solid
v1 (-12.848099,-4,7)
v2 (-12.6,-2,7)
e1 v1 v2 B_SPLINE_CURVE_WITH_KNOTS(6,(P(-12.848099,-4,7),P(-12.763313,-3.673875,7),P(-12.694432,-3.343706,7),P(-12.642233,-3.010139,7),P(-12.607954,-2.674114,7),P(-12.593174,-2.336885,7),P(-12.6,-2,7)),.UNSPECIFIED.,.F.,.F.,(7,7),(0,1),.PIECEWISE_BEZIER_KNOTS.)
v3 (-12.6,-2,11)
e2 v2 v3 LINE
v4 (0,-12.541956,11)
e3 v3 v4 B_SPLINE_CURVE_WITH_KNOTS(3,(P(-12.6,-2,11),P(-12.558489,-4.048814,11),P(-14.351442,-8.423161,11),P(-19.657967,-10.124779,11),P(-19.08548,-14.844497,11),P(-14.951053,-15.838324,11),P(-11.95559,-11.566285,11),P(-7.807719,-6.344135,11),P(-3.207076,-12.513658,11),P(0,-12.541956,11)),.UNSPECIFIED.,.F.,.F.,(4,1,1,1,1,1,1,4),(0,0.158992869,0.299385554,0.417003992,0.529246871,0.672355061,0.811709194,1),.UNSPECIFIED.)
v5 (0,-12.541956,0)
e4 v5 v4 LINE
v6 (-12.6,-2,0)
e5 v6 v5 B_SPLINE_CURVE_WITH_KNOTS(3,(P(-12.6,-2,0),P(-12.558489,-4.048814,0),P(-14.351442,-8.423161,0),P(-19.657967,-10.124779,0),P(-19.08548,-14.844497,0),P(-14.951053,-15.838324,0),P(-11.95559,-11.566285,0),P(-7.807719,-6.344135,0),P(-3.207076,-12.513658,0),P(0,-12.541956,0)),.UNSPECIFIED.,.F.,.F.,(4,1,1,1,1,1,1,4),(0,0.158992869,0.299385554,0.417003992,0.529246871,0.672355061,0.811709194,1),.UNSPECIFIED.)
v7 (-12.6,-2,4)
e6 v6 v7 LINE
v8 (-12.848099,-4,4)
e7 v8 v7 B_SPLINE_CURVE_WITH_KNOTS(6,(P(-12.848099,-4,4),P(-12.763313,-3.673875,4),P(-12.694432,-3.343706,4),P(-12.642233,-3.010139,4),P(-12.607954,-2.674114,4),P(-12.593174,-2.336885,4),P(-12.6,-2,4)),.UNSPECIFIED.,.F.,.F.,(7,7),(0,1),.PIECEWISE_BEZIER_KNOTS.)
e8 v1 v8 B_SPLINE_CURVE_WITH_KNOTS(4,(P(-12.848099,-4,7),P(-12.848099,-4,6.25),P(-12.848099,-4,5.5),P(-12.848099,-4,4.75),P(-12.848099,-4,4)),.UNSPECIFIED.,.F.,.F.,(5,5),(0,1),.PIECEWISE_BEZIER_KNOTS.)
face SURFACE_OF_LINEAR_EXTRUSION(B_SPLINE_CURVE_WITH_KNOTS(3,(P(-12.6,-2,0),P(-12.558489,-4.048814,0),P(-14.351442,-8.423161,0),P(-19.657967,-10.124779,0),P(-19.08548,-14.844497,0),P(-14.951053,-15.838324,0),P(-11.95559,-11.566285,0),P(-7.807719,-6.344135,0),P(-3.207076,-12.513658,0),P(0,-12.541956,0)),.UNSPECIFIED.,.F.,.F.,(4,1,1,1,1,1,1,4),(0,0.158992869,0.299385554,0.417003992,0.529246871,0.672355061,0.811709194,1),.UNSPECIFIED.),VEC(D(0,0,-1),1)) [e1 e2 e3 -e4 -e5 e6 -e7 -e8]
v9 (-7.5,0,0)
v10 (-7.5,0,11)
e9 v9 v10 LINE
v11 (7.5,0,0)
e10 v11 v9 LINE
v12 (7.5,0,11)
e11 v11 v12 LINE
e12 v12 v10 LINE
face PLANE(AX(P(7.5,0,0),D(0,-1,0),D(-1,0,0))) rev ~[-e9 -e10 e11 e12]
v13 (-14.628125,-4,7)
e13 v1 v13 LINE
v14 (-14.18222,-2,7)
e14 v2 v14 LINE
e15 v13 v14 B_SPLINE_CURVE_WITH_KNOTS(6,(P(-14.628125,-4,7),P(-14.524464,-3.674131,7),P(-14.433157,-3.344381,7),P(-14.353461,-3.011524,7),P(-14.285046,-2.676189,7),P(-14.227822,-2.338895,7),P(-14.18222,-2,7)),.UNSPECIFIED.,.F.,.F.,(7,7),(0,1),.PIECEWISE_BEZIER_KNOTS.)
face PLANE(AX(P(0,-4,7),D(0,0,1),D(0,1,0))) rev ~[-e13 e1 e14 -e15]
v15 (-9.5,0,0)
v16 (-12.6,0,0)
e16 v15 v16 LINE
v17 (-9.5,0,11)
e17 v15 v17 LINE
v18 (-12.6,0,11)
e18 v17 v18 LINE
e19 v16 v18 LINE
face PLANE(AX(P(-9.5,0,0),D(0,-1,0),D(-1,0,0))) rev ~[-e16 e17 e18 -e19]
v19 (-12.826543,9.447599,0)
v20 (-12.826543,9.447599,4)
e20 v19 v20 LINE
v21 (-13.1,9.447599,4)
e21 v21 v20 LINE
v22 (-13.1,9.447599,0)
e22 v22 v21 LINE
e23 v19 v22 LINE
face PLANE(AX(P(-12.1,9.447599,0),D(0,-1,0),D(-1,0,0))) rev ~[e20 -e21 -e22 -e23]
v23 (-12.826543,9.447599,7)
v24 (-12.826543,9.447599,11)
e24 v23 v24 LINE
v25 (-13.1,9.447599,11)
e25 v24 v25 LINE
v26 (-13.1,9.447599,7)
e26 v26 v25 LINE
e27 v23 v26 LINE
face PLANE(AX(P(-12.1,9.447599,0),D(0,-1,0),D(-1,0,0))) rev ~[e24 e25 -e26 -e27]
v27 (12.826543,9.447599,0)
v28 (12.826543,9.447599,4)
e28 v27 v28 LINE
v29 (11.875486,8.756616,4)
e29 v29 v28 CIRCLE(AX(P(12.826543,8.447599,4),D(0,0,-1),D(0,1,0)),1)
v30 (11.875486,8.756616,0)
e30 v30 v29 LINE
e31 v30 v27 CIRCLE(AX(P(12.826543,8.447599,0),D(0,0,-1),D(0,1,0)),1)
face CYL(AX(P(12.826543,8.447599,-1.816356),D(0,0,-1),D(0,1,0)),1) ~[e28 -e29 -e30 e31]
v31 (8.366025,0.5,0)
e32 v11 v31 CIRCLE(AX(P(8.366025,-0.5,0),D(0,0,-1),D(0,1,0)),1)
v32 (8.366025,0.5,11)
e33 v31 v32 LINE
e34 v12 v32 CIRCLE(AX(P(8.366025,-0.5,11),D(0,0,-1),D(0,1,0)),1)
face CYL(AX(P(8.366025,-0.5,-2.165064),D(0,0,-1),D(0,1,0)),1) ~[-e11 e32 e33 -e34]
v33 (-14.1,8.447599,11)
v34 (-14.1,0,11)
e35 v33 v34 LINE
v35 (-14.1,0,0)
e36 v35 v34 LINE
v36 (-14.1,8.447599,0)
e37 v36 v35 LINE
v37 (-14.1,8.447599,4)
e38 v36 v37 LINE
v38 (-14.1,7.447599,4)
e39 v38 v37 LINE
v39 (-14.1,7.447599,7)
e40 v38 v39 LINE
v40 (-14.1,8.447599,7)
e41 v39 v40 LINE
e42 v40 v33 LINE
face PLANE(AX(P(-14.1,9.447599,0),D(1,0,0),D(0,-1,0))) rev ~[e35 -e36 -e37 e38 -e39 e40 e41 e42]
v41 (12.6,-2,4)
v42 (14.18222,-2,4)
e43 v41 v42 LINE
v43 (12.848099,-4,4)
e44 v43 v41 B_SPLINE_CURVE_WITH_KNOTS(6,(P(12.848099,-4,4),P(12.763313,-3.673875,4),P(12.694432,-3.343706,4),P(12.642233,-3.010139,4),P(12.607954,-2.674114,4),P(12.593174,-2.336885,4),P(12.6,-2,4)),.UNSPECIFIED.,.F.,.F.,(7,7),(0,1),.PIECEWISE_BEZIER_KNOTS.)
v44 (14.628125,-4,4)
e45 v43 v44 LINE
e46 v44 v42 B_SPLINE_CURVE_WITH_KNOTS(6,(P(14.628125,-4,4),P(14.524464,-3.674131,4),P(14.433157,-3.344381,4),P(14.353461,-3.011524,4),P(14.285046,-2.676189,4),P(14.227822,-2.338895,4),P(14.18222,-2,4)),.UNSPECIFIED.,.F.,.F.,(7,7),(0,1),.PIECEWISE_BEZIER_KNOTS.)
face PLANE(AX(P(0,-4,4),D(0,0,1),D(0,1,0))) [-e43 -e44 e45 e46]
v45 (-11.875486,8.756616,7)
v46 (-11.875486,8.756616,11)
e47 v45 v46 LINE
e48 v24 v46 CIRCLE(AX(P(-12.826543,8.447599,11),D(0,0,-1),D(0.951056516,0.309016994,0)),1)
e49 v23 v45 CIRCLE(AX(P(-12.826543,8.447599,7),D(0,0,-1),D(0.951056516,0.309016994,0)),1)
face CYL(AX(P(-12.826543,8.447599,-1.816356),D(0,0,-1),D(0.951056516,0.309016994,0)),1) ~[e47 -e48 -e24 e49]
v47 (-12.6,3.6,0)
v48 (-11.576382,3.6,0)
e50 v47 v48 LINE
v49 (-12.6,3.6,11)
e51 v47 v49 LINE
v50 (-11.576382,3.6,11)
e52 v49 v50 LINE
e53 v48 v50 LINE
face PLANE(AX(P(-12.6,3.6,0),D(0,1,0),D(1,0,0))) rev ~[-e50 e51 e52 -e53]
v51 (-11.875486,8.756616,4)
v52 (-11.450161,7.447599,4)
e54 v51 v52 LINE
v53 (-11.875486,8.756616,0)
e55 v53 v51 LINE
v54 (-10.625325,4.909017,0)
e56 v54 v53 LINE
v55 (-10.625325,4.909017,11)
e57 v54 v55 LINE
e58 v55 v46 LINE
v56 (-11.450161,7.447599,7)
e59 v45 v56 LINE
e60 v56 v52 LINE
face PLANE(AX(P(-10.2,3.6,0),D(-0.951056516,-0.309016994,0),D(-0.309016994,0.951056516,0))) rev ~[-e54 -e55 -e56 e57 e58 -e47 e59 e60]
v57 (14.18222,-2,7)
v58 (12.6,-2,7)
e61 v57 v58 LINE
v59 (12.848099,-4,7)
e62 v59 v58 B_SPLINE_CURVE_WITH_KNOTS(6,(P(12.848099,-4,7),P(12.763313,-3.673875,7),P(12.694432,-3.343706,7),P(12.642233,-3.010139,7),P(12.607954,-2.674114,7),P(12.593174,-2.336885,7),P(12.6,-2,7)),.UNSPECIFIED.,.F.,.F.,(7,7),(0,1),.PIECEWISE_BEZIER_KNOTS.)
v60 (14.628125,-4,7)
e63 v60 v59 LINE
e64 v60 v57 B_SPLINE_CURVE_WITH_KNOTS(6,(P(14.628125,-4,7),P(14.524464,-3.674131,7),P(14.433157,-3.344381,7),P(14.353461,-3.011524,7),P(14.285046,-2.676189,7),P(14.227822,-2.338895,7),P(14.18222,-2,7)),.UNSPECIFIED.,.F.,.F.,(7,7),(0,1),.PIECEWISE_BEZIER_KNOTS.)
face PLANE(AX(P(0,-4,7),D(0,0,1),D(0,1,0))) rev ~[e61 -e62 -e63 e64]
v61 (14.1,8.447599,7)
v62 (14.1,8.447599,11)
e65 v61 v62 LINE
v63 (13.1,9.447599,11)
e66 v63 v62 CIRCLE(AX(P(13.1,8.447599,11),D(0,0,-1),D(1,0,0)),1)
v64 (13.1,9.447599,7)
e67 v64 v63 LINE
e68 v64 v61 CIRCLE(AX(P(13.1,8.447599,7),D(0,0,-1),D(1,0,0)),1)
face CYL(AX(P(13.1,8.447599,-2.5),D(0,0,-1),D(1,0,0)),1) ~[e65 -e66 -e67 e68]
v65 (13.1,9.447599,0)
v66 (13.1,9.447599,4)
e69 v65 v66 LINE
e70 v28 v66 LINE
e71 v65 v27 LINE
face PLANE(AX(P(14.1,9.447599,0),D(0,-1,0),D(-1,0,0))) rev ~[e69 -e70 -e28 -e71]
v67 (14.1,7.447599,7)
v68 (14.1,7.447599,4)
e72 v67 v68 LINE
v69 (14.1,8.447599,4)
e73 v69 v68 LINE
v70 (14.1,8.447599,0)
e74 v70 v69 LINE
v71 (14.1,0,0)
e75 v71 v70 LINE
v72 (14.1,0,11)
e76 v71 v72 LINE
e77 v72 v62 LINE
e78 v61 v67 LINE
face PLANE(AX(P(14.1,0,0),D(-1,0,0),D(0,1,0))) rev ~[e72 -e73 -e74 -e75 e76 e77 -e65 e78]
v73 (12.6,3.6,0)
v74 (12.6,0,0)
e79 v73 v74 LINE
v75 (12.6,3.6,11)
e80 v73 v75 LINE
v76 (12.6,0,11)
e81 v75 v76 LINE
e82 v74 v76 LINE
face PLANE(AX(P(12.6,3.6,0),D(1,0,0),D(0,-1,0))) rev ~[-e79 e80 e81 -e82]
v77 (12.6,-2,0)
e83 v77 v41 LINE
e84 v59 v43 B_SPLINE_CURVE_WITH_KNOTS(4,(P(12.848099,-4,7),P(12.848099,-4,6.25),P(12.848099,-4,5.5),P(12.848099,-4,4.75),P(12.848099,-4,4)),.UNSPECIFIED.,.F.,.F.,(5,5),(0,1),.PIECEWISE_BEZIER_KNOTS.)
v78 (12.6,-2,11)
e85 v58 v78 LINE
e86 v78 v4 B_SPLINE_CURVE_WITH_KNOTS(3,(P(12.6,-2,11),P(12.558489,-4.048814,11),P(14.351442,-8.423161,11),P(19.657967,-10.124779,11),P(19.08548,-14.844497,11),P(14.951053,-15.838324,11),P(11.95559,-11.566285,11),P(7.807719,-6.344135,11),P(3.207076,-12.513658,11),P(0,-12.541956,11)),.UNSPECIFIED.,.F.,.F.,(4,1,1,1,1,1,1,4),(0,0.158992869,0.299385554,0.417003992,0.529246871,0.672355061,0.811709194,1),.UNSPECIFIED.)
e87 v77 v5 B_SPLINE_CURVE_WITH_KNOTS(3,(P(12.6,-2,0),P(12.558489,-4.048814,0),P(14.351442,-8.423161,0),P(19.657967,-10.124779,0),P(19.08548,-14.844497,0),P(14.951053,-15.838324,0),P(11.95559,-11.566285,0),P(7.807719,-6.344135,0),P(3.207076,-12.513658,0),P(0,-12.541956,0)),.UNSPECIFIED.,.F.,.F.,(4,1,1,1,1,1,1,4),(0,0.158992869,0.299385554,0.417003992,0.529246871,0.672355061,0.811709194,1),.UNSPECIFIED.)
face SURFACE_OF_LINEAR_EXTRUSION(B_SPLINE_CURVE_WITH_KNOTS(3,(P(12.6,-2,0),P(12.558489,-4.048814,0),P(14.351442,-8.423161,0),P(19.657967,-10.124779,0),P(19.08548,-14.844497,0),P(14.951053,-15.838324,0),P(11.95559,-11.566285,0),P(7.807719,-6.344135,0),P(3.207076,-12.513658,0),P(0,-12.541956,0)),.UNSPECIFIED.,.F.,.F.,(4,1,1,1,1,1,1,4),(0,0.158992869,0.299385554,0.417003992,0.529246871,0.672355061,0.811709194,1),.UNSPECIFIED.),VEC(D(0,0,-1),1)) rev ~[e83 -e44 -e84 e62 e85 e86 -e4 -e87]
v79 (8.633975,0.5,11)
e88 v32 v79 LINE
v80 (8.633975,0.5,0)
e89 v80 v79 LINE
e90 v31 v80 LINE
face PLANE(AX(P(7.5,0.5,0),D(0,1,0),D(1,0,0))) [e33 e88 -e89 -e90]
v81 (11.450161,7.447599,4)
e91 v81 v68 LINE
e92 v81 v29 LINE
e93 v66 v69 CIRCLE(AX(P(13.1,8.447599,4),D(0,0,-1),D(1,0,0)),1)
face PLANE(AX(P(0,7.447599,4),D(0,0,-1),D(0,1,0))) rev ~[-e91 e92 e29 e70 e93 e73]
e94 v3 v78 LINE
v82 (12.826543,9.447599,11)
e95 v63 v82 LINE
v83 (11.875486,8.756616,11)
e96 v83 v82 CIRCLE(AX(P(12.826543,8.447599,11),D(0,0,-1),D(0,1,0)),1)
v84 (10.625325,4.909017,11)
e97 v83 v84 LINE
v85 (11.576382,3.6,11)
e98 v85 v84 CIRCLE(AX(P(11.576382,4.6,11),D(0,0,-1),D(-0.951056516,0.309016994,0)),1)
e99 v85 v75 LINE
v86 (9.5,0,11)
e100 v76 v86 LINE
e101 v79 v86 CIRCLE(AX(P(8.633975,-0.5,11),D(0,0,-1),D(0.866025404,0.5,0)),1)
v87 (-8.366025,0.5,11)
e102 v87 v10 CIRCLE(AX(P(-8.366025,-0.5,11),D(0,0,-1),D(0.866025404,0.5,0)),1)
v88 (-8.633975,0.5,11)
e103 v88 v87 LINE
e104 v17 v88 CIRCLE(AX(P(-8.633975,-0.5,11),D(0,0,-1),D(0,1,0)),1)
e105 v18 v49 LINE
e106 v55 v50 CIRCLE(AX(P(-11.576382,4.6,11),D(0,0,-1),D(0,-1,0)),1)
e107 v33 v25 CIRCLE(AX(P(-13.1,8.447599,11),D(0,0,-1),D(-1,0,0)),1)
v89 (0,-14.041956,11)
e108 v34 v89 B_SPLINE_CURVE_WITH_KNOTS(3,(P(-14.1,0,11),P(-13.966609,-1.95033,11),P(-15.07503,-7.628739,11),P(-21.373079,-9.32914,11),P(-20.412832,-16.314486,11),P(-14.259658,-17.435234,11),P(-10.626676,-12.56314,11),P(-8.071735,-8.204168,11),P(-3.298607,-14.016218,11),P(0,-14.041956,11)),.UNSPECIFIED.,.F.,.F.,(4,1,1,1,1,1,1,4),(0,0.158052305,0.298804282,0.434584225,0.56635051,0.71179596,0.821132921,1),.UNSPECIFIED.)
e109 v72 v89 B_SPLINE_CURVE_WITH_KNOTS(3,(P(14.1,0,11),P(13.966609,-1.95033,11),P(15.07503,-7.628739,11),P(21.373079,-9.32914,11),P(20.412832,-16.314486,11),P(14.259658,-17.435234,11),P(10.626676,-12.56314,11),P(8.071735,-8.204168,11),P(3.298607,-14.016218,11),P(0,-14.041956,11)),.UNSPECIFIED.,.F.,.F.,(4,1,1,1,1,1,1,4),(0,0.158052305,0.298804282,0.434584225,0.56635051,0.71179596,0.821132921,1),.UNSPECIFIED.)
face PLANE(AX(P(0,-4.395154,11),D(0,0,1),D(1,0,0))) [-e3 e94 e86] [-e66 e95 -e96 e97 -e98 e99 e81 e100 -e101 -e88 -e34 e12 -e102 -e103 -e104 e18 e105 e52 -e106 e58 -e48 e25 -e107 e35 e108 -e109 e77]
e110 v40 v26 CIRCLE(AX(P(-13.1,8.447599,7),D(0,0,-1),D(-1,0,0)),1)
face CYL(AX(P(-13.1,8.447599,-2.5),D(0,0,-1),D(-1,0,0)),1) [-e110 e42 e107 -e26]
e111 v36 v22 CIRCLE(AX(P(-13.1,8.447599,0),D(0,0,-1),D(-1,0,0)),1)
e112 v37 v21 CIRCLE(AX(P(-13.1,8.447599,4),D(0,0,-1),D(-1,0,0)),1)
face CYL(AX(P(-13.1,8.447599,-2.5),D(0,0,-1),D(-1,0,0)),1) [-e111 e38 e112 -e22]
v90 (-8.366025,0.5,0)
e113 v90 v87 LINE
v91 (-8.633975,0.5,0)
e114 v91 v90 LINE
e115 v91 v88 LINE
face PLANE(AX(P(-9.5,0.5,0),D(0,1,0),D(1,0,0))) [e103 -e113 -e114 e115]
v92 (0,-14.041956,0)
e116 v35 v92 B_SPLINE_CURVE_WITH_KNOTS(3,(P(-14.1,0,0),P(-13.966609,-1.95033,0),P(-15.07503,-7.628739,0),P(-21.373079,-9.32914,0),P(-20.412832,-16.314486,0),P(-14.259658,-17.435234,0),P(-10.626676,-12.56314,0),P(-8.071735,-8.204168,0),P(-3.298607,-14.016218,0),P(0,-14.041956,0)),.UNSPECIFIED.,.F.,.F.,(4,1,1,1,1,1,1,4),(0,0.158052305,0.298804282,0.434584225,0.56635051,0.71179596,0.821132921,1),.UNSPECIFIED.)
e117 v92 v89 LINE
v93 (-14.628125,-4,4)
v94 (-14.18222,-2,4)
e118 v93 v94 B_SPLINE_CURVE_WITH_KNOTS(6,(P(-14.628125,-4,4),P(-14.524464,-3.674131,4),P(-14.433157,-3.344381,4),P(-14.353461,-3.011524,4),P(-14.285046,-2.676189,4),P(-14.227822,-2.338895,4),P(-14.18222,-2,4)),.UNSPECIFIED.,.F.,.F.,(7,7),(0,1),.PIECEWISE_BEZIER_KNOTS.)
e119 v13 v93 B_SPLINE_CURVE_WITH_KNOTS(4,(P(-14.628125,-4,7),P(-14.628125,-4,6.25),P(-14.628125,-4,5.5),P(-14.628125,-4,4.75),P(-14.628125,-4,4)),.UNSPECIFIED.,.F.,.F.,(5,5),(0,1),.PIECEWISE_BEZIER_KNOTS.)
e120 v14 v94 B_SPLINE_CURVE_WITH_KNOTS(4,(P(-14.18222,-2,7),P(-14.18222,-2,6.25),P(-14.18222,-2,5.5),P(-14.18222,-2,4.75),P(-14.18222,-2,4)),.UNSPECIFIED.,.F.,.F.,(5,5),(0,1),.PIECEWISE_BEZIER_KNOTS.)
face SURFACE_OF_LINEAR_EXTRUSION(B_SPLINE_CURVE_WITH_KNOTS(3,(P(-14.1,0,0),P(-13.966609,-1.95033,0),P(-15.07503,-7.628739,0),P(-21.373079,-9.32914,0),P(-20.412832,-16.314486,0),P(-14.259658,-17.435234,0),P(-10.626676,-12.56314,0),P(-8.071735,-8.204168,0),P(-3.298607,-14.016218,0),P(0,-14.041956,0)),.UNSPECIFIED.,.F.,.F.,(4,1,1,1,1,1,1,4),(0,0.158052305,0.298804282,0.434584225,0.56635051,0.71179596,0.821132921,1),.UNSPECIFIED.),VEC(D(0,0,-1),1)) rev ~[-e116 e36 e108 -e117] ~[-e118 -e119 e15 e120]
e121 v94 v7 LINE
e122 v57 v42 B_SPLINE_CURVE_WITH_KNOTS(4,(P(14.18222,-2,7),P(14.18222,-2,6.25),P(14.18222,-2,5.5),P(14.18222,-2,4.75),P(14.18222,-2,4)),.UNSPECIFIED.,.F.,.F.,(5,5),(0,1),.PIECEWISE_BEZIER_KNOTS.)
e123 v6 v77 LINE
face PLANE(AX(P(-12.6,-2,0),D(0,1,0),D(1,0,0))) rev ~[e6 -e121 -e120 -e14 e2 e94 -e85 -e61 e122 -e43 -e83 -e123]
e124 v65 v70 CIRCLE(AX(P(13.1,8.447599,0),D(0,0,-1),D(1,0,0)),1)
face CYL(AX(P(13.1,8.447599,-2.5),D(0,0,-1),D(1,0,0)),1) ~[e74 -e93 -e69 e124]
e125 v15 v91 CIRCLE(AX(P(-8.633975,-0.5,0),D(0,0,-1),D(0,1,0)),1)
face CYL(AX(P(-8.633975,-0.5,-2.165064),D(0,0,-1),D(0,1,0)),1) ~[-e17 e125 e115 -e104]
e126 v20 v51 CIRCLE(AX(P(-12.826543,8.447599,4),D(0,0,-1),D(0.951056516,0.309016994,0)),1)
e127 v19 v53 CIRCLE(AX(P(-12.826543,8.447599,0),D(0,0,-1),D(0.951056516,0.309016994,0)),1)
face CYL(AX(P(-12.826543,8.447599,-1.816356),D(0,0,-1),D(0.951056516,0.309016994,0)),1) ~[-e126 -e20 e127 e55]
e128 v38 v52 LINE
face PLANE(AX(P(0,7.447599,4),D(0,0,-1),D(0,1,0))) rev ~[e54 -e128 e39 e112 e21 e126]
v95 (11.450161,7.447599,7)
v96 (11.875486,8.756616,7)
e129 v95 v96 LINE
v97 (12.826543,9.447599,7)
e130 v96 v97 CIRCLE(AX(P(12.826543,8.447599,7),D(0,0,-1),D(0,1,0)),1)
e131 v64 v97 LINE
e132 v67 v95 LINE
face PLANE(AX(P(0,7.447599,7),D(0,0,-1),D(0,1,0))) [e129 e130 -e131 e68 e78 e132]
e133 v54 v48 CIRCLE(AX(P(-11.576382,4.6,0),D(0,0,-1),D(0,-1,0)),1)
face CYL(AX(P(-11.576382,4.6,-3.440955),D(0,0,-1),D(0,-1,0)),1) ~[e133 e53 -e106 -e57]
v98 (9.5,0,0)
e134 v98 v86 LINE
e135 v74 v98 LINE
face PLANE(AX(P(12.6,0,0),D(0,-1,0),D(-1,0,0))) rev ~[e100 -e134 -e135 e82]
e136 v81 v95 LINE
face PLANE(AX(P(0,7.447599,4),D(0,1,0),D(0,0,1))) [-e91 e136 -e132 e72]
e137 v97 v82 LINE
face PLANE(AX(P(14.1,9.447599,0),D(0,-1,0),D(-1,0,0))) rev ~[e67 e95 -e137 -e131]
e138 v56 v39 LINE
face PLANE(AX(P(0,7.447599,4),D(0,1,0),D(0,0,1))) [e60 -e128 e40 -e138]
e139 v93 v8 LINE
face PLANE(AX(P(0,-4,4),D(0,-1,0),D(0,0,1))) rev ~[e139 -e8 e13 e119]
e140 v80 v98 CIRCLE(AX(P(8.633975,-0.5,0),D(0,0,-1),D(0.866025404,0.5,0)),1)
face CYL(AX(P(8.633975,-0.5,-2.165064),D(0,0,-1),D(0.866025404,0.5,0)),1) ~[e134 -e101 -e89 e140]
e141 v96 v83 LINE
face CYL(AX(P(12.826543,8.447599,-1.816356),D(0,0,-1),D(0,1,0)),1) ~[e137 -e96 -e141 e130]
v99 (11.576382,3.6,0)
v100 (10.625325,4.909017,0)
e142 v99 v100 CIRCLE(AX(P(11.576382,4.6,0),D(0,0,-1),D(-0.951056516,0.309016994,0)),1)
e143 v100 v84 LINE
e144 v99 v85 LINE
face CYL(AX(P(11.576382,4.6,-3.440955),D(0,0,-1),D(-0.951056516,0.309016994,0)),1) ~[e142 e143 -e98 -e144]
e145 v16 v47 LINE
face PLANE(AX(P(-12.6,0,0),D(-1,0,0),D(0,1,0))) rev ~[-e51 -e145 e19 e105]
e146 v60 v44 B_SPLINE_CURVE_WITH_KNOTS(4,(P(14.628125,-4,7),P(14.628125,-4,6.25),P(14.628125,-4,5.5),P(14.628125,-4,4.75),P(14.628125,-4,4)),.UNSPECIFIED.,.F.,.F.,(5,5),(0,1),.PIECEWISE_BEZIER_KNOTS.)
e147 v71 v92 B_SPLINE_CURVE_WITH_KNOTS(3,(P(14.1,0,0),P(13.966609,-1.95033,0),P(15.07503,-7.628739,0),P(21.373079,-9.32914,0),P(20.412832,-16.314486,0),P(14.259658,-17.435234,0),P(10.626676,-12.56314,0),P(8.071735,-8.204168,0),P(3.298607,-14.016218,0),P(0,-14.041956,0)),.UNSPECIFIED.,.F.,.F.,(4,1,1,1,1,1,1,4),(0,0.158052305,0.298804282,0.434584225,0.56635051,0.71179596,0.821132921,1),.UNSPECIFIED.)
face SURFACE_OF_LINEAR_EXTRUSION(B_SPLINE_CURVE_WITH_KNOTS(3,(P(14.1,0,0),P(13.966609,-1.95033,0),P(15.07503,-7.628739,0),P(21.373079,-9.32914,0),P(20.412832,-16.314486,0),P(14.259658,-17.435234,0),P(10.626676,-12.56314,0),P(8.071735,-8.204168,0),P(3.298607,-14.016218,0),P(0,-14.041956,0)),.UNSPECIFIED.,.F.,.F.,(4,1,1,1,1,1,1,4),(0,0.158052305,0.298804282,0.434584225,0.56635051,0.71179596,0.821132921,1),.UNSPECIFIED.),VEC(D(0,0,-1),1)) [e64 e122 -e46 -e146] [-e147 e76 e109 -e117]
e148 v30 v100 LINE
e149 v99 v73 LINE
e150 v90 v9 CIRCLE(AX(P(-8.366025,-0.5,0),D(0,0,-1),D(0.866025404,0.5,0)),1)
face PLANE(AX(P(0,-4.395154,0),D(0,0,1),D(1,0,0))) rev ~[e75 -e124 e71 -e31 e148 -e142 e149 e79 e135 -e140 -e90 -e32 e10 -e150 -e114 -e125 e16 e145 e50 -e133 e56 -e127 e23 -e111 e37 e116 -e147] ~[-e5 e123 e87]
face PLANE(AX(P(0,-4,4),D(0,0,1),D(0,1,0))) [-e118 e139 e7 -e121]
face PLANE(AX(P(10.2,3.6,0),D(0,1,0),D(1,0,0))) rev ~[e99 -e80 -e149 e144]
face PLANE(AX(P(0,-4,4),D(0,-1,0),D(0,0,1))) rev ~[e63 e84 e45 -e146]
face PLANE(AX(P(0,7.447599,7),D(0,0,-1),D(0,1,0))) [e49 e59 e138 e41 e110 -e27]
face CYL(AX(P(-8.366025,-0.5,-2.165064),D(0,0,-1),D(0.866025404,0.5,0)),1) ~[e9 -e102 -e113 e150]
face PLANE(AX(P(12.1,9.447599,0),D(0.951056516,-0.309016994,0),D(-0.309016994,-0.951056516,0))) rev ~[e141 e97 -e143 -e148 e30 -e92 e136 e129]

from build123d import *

# Parameters (mm, degrees)
F0_W        = 2
F0_H        = 0.5
F1_DEPTH    = 11
F2_T1_DEPTH = 17.8819096024
F2_T3_DEPTH = 16
F2_T5_DEPTH = 14.63271264
F2_T7_DEPTH = 15.3301270189
F3_W        = 2
F3_H        = 3
F4_DEPTH    = 15


# Not quite as in the source:
# - a fillet or chamfer that OpenCascade refuses, or shapes differently, is made with other operations: its cross-section is extruded or revolved along the edge and cut away or added


with BuildPart() as f1:
    # F0 (on Top) → F1 (new body)
    with BuildSketch(Plane.XY):
        with BuildLine():
            Line((-14.1, 9.4475987206), (-14.1, 0))
            add(Edge.make_bspline(
                [(-14.1, 0), (-13.9666085935, -1.9503301305), (-15.0750300263, -7.6287393484), (-21.3730788003, -9.3291396524), (-20.4128316218, -16.3144858473), (-14.259658092, -17.4352339168), (-10.6266757986, -12.5631403321), (-8.07173481, -8.20416774), (-3.298607474, -14.0162183623), (0, -14.0419555828)],
                knots=[0, 0, 0, 0, 0.1580523046, 0.2988042817, 0.4345842251, 0.5663505105, 0.7117959604, 0.8211329211, 1, 1, 1, 1], degree=3))
            add(Edge.make_bspline(
                [(14.1, 0), (13.9666085935, -1.9503301305), (15.0750300263, -7.6287393484), (21.3730788003, -9.3291396524), (20.4128316218, -16.3144858473), (14.259658092, -17.4352339168), (10.6266757986, -12.5631403321), (8.07173481, -8.20416774), (3.298607474, -14.0162183623), (0, -14.0419555828)],
                knots=[0, 0, 0, 0, 0.1580523046, 0.2988042817, 0.4345842251, 0.5663505105, 0.7117959604, 0.8211329211, 1, 1, 1, 1], degree=3))
            Line((14.1, 0), (14.1, 9.4475987206))
            Line((14.1, 9.4475987206), (12.1, 9.4475987206))
            Line((12.1, 9.4475987206), (10.2, 3.6))
            Line((10.2, 3.6), (12.6, 3.6))
            Line((12.6, 3.6), (12.6, 0))
            Line((12.6, 0), (9.5, 0))
            Line((9.5, 0), (7.5, 0))
            Line((7.5, 0), (0, 0))
            Line((0, 0), (-7.5, 0))
            Line((-7.5, 0), (-9.5, 0))
            Line((-9.5, 0), (-12.6, 0))
            Line((-12.6, 0), (-12.6, 3.6))
            Line((-12.6, 3.6), (-10.2, 3.6))
            Line((-10.2, 3.6), (-12.1, 9.4475987206))
            Line((-12.1, 9.4475987206), (-14.1, 9.4475987206))
        make_face()
        with BuildLine():
            add(Edge.make_bspline(
                [(-12.6, -2), (-12.5584885174, -4.0488143731), (-14.3514424803, -8.4231611099), (-19.6579670763, -10.1247790951), (-19.0854803087, -14.8444965683), (-14.951052578, -15.8383241392), (-11.9555900431, -11.5662850742), (-7.8077190594, -6.3441347041), (-3.2070761008, -12.5136579418), (0, -12.5419555828)],
                knots=[0, 0, 0, 0, 0.1589928689, 0.2993855539, 0.4170039917, 0.5292468706, 0.6723550613, 0.8117091941, 1, 1, 1, 1], degree=3))
            Line((-12.6, -2), (12.6, -2))
            add(Edge.make_bspline(
                [(12.6, -2), (12.5584885174, -4.0488143731), (14.3514424803, -8.4231611099), (19.6579670763, -10.1247790951), (19.0854803087, -14.8444965683), (14.951052578, -15.8383241392), (11.9555900431, -11.5662850742), (7.8077190594, -6.3441347041), (3.2070761008, -12.5136579418), (0, -12.5419555828)],
                knots=[0, 0, 0, 0, 0.1589928689, 0.2993855539, 0.4170039917, 0.5292468706, 0.6723550613, 0.8117091941, 1, 1, 1, 1], degree=3))
        make_face(mode=Mode.SUBTRACT)
        with Locations((-8.5, 0.25)):
            Rectangle(F0_W, F0_H)
        with Locations((8.5, 0.25)):
            Rectangle(F0_W, F0_H)
    extrude(amount=F1_DEPTH)

    # F2: fillet of radius 1 on 10 edges, made by hand

    # F2_s2 → F2_t1 (cut)
    with BuildSketch(Plane.XY.offset(-3.4409548012)):
        with BuildLine():
            ThreePointArc((-11.5763819205, 3.6), (-10.7673649261, 4.0122147477), (-10.6253254042, 4.9090169944))
            Line((-10.6253254042, 4.9090169944), (-10.2, 3.6))
            Line((-10.2, 3.6), (-11.5763819205, 3.6))
        make_face()
        with BuildLine():
            ThreePointArc((10.6253254042, 4.9090169944), (10.7673649261, 4.0122147477), (11.5763819205, 3.6))
            Line((11.5763819205, 3.6), (10.2, 3.6))
            Line((10.2, 3.6), (10.6253254042, 4.9090169944))
        make_face()
    extrude(amount=F2_T1_DEPTH, mode=Mode.SUBTRACT)

    # F2_s4 → F2_t3 (cut)
    with BuildSketch(Plane.XY.offset(-2.5)):
        with BuildLine():
            ThreePointArc((-14.1, 8.4475987206), (-13.8071067812, 9.1547055018), (-13.1, 9.4475987206))
            Line((-13.1, 9.4475987206), (-14.1, 9.4475987206))
            Line((-14.1, 9.4475987206), (-14.1, 8.4475987206))
        make_face()
        with BuildLine():
            ThreePointArc((14.1, 8.4475987206), (13.8071067812, 9.1547055018), (13.1, 9.4475987206))
            Line((13.1, 9.4475987206), (14.1, 9.4475987206))
            Line((14.1, 9.4475987206), (14.1, 8.4475987206))
        make_face()
    extrude(amount=F2_T3_DEPTH, mode=Mode.SUBTRACT)

    # F2_s6 → F2_t5 (cut)
    with BuildSketch(Plane.XY.offset(-1.81635632)):
        with BuildLine():
            ThreePointArc((-11.8754860117, 8.756615715), (-12.2387572757, 9.256615715), (-12.826542528, 9.4475987206))
            Line((-12.826542528, 9.4475987206), (-12.1, 9.4475987206))
            Line((-12.1, 9.4475987206), (-11.8754860117, 8.756615715))
        make_face()
        with BuildLine():
            ThreePointArc((12.826542528, 9.4475987206), (12.2387572757, 9.256615715), (11.8754860117, 8.756615715))
            Line((11.8754860117, 8.756615715), (12.1, 9.4475987206))
            Line((12.1, 9.4475987206), (12.826542528, 9.4475987206))
        make_face()
    extrude(amount=F2_T5_DEPTH, mode=Mode.SUBTRACT)

    # F2_s8 → F2_t7 (cut)
    with BuildSketch(Plane.XY.offset(-2.1650635095)):
        with BuildLine():
            ThreePointArc((-8.6339745962, 0.5), (-9.1339745962, 0.3660254038), (-9.5, 0))
            Line((-9.5, 0), (-9.5, 0.5))
            Line((-9.5, 0.5), (-8.6339745962, 0.5))
        make_face()
        with BuildLine():
            ThreePointArc((-7.5, 0), (-7.8660254038, 0.3660254038), (-8.3660254038, 0.5))
            Line((-8.3660254038, 0.5), (-7.5, 0.5))
            Line((-7.5, 0.5), (-7.5, 0))
        make_face()
        with BuildLine():
            ThreePointArc((8.3660254038, 0.5), (7.8660254038, 0.3660254038), (7.5, 0))
            Line((7.5, 0), (7.5, 0.5))
            Line((7.5, 0.5), (8.3660254038, 0.5))
        make_face()
        with BuildLine():
            ThreePointArc((9.5, 0), (9.1339745962, 0.3660254038), (8.6339745962, 0.5))
            Line((8.6339745962, 0.5), (9.5, 0.5))
            Line((9.5, 0.5), (9.5, 0))
        make_face()
    extrude(amount=F2_T7_DEPTH, mode=Mode.SUBTRACT)

    # F3 (on Right) → F4 (cut, symmetric)
    with BuildSketch(Plane.YZ):
        with Locations((-3, 5.5)):
            Rectangle(F3_W, F3_H)
        with Locations((8.4475987206, 5.5)):
            Rectangle(F3_W, F3_H)
    extrude(amount=F4_DEPTH, both=True, mode=Mode.SUBTRACT)


solid = f1.part
